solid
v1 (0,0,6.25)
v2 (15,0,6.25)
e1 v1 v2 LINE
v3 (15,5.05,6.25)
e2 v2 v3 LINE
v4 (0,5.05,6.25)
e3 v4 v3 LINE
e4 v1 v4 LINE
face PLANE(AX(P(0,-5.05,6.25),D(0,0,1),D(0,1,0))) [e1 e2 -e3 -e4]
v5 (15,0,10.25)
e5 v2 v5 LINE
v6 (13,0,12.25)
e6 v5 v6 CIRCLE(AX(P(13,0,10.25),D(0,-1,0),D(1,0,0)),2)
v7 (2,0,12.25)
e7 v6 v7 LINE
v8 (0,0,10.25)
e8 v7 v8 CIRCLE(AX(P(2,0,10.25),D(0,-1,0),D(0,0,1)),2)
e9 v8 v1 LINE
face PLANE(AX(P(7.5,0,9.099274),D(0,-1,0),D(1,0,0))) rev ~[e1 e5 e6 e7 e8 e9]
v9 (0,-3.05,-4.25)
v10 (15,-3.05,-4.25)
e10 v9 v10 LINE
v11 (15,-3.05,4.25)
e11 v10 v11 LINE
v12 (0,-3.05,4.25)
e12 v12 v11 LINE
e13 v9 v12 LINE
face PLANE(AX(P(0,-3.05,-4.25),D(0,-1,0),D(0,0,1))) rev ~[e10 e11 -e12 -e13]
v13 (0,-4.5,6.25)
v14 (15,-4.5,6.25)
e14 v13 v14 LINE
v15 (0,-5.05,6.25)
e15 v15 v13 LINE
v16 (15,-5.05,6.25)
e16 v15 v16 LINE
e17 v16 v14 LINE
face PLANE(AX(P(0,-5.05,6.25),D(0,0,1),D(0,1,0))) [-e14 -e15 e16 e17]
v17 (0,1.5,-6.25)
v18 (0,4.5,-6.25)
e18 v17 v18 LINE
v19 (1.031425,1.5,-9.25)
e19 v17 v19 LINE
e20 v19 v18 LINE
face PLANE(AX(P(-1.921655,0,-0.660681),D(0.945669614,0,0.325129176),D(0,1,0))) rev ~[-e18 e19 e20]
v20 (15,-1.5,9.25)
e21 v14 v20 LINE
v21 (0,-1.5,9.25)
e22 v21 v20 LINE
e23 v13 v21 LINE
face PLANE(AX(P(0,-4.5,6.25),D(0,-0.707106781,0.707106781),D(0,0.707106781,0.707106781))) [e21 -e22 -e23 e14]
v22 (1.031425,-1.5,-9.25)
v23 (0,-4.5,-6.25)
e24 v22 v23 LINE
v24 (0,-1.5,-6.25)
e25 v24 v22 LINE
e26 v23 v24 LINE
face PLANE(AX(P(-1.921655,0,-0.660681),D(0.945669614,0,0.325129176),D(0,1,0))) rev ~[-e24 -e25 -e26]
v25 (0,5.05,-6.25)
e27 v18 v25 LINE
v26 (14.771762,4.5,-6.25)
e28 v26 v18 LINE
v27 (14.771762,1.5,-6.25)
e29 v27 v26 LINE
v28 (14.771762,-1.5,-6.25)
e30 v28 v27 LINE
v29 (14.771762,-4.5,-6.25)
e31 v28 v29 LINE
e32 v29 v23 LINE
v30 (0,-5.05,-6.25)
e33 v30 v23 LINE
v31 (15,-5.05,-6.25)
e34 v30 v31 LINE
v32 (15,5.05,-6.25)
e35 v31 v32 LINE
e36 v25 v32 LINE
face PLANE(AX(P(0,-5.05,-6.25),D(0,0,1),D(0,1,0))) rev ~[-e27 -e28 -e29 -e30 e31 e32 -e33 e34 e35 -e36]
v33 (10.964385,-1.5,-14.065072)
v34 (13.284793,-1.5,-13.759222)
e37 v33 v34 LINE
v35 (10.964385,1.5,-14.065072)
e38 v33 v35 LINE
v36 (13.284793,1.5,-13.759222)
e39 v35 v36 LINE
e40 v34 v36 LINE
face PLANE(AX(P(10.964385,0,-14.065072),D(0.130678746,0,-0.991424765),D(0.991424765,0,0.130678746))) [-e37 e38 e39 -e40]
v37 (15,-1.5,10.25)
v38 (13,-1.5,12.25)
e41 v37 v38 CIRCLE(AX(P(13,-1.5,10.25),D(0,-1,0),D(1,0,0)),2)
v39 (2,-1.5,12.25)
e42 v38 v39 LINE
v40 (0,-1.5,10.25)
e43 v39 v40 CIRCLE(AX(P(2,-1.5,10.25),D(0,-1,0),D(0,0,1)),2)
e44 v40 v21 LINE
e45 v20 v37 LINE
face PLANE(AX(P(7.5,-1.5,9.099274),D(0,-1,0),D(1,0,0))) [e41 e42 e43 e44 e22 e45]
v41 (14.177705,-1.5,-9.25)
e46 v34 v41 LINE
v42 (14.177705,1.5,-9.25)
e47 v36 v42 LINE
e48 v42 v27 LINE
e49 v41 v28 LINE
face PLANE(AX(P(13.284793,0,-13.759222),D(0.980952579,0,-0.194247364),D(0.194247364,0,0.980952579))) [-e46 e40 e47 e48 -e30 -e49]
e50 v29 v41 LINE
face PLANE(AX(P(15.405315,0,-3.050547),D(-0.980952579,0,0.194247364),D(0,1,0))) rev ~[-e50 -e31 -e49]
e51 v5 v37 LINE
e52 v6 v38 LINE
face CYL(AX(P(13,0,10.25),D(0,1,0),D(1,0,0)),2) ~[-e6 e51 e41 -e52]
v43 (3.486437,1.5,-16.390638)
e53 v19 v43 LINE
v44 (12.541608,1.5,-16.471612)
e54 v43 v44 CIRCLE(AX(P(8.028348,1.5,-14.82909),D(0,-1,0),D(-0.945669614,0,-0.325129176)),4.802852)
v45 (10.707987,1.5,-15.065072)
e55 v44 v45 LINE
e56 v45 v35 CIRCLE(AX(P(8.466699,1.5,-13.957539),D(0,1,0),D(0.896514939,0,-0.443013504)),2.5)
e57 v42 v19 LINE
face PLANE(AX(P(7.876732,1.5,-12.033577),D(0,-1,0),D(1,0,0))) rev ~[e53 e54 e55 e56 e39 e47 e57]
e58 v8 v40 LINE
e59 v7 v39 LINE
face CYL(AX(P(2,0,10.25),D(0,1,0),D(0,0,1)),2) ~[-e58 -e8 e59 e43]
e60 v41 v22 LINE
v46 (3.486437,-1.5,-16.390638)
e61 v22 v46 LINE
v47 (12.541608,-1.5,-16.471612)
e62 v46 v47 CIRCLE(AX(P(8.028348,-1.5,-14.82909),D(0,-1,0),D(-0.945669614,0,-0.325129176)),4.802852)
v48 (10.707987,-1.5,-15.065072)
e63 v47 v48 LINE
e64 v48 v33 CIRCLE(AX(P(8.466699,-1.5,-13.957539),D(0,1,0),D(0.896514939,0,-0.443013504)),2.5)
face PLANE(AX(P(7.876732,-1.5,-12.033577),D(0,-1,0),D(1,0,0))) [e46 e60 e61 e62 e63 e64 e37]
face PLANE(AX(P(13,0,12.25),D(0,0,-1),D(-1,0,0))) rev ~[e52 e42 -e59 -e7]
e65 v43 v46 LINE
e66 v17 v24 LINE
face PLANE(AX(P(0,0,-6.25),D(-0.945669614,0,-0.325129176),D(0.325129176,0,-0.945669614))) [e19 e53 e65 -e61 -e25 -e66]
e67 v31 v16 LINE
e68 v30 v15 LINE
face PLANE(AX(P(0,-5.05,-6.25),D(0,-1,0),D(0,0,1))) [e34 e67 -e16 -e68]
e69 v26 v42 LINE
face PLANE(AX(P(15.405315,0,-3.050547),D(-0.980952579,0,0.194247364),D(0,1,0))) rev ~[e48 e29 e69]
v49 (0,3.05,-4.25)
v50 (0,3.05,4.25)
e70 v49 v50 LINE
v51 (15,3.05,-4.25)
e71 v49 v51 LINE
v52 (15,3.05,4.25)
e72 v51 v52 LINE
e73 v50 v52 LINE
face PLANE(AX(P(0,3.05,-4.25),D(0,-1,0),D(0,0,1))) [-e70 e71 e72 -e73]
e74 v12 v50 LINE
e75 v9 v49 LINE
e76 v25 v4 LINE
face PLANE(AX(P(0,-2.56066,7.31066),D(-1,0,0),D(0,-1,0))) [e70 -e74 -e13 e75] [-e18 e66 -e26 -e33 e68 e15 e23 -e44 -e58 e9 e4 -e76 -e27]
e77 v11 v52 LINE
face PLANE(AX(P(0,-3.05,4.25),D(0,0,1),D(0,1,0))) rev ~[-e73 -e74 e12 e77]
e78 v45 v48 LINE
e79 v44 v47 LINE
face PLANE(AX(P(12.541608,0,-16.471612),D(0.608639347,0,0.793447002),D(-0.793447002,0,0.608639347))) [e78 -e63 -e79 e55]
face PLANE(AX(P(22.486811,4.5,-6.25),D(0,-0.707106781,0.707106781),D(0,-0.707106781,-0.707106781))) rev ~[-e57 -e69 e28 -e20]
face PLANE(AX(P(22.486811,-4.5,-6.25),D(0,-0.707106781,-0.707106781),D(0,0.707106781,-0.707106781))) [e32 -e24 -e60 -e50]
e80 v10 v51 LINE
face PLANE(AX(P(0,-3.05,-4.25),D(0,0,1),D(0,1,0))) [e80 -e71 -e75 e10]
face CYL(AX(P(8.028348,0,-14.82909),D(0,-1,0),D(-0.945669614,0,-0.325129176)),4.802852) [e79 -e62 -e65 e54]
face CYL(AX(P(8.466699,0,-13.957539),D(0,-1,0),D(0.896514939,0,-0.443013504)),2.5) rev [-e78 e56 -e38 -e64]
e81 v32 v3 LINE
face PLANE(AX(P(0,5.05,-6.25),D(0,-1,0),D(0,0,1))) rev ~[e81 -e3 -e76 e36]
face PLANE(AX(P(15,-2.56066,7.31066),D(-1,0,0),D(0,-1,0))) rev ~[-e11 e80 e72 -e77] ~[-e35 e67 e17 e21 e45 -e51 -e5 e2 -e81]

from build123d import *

# Parameters (mm, degrees)
F0_W         = 10.1
F0_H         = 12.5
F0_W_2       = 6.1
F0_H_2       = 8.5
F1_DEPTH     = 15
F3_DEPTH     = 1.5
F5_DEPTH     = 1.5
F6_T1_DEPTH  = 15
F6_T6_DEPTH  = 22.4868112825
F6_T12_DEPTH = 22.4868112825


# Not quite as in the source:
# - a fillet or chamfer that OpenCascade refuses, or shapes differently, is made with other operations: its cross-section is extruded or revolved along the edge and cut away or added


with BuildPart() as f1:
    # F0 (on Right) → F1 (new body)
    with BuildSketch(Plane.YZ):
        Rectangle(F0_W, F0_H)
        Rectangle(F0_W_2, F0_H_2, mode=Mode.SUBTRACT)
    extrude(amount=F1_DEPTH)

    # F2 (on Front) → F3 (join, symmetric)
    with BuildSketch(Plane.XZ):
        with BuildLine():
            Line((14.7717623186, -6.25), (0, -6.25))
            Line((0, -6.25), (3.4864366891, -16.3906378753))
            ThreePointArc((3.4864366891, -16.3906378753), (7.9854016639, -19.6317508441), (12.5416083041, -16.4716115793))
            Line((12.5416083041, -16.4716115793), (10.7079865556, -15.0650723372))
            ThreePointArc((10.7079865556, -15.0650723372), (6.0450329155, -13.3366260518), (10.964385436, -14.0650723372))
            Line((10.964385436, -14.0650723372), (13.2847928678, -13.7592216636))
            Line((13.2847928678, -13.7592216636), (14.7717623186, -6.25))
        make_face()
    extrude(amount=F3_DEPTH, both=True)

    # F4 (on Front) → F5 (join)
    with BuildSketch(Plane.XZ):
        with BuildLine():
            Line((0, 10.25), (0, 6.25))
            Line((0, 6.25), (15, 6.25))
            Line((15, 6.25), (15, 10.25))
            ThreePointArc((15, 10.25), (14.4142135624, 11.6642135624), (13, 12.25))
            Line((13, 12.25), (2, 12.25))
            ThreePointArc((2, 12.25), (0.5857864376, 11.6642135624), (0, 10.25))
        make_face()
    extrude(amount=F5_DEPTH)

    # F6: chamfer of 3 on 3 edges, made by hand

    # F6_s2 → F6_t1 (join)
    with BuildSketch(Plane.YZ):
        Polygon((-4.5, 6.25), (-1.5, 9.25), (-1.5, 6.25), align=None)
    extrude(amount=F6_T1_DEPTH)


with BuildPart() as f6_tool4:
    # F6_s5 → F6_t6 (new body)
    with BuildSketch(Plane.YZ.offset(22.4868112825)):
        Polygon((-4.5, -6.25), (-1.5, -9.25), (-1.5, -6.25), align=None)
    extrude(amount=-F6_T6_DEPTH)

    split(bisect_by=Plane(origin=(15.4053151941, 0, -3.0505469275), x_dir=(0, 1, 0), z_dir=(-0.9809525786, 0, 0.1942473644)), keep=Keep.TOP)

    split(bisect_by=Plane(origin=(-1.9216548906, 0, -0.6606811324), x_dir=(0, 1, 0), z_dir=(0.945669614, 0, 0.3251291761)), keep=Keep.TOP)


with BuildPart() as f1_1:
    add(f1.part)

    # F6_t3: union F6_tool4
    add(f6_tool4.part)


with BuildPart() as f6_tool10:
    # F6_s11 → F6_t12 (new body)
    with BuildSketch(Plane.YZ.offset(22.4868112825)):
        Polygon((4.5, -6.25), (1.5, -9.25), (1.5, -6.25), align=None)
    extrude(amount=-F6_T12_DEPTH)

    split(bisect_by=Plane(origin=(15.4053151941, 0, -3.0505469275), x_dir=(0, 1, 0), z_dir=(-0.9809525786, 0, 0.1942473644)), keep=Keep.TOP)

    split(bisect_by=Plane(origin=(-1.9216548906, 0, -0.6606811324), x_dir=(0, 1, 0), z_dir=(0.945669614, 0, 0.3251291761)), keep=Keep.TOP)


with BuildPart() as f1_2:
    add(f1_1.part)

    # F6_t9: union F6_tool10
    add(f6_tool10.part)


solid = f1_2.part
